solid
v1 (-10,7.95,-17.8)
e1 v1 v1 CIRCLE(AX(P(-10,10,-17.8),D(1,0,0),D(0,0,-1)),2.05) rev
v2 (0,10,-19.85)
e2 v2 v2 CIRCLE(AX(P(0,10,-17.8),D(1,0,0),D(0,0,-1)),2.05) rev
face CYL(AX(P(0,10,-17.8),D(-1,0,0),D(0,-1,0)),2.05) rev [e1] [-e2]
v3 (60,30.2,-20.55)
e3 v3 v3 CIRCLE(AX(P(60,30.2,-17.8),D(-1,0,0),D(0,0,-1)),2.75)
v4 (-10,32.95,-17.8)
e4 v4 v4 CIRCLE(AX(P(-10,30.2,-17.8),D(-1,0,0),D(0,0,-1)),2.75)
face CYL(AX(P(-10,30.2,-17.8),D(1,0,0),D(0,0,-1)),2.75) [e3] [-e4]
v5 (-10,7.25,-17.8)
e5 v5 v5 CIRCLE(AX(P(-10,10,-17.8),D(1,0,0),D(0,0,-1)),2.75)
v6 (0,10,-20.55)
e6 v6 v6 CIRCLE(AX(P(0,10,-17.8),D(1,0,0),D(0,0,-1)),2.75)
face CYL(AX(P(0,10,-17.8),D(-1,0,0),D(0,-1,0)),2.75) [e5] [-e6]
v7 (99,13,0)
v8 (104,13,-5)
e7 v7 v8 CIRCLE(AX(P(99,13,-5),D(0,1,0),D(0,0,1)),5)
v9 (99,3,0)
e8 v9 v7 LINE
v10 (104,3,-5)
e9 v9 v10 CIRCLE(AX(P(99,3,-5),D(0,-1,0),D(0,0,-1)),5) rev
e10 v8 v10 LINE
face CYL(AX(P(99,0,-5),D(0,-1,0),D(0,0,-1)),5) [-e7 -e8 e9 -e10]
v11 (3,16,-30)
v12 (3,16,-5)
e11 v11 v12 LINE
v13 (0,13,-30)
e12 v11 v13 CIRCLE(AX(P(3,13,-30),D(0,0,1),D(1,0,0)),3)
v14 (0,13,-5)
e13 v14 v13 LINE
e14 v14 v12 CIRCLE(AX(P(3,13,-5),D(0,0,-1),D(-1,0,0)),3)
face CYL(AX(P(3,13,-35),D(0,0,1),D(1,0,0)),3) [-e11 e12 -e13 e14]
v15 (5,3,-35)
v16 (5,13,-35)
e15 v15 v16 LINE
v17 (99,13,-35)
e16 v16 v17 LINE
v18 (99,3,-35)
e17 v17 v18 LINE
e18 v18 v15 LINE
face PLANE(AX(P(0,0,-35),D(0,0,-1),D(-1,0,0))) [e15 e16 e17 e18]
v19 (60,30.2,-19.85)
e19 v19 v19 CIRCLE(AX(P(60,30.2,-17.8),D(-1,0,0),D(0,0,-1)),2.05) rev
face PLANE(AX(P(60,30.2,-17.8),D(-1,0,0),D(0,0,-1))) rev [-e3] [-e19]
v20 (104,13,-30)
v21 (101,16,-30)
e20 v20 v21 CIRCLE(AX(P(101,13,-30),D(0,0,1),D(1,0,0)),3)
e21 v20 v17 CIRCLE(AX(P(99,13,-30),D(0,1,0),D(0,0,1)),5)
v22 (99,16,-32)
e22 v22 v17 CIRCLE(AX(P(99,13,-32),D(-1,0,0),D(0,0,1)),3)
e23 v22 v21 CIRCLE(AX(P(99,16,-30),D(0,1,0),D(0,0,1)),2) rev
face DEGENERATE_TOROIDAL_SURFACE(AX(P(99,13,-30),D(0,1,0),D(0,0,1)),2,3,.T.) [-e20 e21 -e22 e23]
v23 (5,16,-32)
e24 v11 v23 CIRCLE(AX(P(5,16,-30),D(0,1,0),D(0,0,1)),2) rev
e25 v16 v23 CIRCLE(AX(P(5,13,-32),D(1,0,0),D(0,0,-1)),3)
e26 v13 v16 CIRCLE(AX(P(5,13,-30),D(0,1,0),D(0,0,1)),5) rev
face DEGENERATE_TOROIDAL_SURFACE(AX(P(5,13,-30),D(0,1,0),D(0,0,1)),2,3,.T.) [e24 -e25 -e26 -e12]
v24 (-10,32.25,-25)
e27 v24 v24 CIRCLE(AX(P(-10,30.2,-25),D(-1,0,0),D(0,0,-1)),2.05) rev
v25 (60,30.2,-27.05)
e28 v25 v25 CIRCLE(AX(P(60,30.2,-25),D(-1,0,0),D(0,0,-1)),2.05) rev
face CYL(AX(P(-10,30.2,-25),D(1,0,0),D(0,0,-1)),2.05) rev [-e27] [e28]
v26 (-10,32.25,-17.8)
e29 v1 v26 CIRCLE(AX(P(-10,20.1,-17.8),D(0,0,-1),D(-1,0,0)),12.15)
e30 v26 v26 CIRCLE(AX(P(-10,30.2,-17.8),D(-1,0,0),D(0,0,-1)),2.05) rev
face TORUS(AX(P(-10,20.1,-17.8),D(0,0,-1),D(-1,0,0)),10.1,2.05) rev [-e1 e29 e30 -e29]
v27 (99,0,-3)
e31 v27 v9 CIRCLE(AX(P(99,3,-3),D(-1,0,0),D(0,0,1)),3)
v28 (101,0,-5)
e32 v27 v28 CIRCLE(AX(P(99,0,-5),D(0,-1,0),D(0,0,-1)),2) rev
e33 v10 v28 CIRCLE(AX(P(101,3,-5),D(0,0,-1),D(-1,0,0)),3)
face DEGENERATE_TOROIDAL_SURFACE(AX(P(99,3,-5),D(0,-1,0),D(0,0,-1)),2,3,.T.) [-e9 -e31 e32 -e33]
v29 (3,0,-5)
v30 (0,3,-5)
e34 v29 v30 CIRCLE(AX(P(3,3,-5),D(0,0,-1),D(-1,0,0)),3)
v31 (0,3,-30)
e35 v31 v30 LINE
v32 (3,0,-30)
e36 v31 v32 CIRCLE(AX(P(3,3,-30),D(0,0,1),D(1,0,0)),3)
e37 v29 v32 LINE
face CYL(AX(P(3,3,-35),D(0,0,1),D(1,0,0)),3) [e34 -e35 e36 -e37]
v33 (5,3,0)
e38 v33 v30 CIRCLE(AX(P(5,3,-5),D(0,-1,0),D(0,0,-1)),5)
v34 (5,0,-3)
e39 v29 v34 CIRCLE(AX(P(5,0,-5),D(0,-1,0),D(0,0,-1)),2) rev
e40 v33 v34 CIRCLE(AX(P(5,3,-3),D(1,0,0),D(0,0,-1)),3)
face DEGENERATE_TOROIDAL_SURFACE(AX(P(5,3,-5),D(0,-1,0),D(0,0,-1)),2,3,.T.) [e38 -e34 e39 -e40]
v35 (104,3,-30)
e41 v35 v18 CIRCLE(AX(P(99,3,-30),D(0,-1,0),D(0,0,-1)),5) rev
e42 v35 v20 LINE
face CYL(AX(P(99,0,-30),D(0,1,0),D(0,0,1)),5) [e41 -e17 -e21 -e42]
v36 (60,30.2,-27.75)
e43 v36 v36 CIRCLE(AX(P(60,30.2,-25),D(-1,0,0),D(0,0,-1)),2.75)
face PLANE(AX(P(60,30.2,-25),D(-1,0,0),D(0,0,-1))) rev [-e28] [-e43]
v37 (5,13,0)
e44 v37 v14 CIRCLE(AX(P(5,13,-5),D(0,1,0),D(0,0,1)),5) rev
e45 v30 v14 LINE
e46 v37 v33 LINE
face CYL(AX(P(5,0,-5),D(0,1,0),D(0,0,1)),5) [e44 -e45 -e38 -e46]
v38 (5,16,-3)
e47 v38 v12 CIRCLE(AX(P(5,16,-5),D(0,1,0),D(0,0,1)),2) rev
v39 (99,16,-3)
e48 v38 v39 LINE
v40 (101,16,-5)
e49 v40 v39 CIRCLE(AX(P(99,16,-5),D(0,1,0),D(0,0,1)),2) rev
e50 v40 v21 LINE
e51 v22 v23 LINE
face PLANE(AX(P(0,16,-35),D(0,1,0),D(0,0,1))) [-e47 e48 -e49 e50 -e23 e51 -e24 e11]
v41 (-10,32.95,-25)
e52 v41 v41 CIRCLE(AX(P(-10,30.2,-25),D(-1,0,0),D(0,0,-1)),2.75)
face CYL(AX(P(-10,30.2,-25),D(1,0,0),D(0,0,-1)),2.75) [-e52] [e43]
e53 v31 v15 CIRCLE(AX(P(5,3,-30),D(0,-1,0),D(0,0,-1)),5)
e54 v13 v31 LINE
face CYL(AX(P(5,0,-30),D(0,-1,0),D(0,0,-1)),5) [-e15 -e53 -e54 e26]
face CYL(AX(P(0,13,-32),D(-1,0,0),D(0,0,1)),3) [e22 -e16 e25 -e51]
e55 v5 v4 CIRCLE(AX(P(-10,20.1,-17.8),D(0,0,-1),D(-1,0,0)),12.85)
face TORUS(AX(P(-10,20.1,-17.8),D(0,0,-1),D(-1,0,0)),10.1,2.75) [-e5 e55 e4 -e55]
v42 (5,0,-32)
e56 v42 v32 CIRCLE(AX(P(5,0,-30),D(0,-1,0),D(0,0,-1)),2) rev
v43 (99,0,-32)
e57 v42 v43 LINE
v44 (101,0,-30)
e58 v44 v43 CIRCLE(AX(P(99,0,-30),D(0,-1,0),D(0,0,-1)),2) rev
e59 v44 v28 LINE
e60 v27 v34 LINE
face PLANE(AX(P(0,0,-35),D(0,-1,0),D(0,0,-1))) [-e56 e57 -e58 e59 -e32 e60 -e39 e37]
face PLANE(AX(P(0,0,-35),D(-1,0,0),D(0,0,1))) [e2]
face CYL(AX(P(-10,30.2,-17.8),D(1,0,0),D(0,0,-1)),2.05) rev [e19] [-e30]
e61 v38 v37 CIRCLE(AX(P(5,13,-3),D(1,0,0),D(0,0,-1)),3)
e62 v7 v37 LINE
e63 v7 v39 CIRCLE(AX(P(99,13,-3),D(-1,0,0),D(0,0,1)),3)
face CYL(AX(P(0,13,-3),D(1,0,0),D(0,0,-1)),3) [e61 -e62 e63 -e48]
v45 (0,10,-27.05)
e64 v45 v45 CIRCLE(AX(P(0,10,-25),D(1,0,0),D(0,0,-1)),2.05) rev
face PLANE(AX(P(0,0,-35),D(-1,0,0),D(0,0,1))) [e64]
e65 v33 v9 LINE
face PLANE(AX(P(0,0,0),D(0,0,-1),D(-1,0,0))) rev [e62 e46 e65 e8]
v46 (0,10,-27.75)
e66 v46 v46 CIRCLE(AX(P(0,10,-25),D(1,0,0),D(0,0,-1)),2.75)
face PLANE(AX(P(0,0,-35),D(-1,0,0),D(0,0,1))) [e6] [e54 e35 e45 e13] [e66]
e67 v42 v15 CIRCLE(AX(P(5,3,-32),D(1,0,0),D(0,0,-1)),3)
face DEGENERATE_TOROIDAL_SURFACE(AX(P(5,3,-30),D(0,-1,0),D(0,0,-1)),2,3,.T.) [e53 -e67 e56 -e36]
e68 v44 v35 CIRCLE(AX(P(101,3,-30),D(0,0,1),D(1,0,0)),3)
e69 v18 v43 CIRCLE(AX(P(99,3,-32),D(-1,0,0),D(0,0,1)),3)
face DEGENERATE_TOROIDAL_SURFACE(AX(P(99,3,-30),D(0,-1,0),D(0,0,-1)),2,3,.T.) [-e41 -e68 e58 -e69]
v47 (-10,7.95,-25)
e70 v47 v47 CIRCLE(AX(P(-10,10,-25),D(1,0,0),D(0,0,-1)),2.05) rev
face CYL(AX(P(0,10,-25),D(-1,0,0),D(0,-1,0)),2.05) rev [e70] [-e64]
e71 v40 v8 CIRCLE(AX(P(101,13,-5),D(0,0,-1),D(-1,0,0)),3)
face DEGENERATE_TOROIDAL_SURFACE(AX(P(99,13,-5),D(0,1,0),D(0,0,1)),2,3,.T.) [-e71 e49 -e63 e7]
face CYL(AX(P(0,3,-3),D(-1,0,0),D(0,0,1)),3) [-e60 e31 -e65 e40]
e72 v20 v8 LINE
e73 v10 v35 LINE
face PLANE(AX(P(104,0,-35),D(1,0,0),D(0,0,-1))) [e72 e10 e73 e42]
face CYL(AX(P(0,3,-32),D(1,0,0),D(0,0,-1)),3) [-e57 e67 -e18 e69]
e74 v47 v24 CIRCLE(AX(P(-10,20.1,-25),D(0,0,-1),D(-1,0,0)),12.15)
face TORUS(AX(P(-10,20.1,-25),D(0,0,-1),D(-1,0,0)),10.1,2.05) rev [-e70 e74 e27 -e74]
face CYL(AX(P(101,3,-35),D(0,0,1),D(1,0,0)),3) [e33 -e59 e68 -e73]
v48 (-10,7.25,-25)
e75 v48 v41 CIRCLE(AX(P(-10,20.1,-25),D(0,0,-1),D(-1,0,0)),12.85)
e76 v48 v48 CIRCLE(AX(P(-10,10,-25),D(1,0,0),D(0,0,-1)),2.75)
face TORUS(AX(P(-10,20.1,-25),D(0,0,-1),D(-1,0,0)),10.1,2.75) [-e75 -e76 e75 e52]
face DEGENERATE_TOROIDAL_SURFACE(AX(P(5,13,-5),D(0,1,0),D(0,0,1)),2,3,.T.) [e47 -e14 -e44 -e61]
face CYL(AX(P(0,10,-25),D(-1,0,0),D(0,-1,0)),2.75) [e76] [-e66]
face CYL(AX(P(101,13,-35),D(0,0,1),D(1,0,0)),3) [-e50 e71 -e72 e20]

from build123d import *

# Parameters (mm, degrees)
SKETCH_1_W      = 104
SKETCH_1_H      = 16
EXTRUDE_1_DEPTH = 35
SKETCH_2_R      = 2.75
SKETCH_2_R_2    = 2.05
FILLET_1_R      = 3
FILLET_2_R      = 5


with BuildPart() as part:
    # 草图1 → 凸台-拉伸1 (new body)
    with BuildSketch(Plane.XY):
        with Locations((52, 8)):
            Rectangle(SKETCH_1_W, SKETCH_1_H)
    extrude(amount=-EXTRUDE_1_DEPTH)

    # 扫描1: sweep along a path in 草图3
    with BuildLine(Plane.XY) as sweep_1_path:
        Line((0, 11.6), (-10, 11.6))
        ThreePointArc((-10, 11.6), (-18.5, 20.1), (-10, 28.6))
        Line((-10, 28.6), (60, 28.6))
    # 草图2 → 扫描1 (sweep)
    # profile 1 of 2: a face of its own
    with BuildSketch(Plane(origin=(0, 0, 0), x_dir=(0, 0, -1), z_dir=(1, 0, 0))):
        with Locations((25, 10)):
            Circle(SKETCH_2_R)
        with Locations((25, 10)):
            Circle(SKETCH_2_R_2, mode=Mode.SUBTRACT)
    # profile 2 of 2: a face of its own
    with BuildSketch(Plane(origin=(0, 0, 0), x_dir=(0, 0, -1), z_dir=(1, 0, 0))):
        with Locations((17.8, 10)):
            Circle(SKETCH_2_R)
        with Locations((17.8, 10)):
            Circle(SKETCH_2_R_2, mode=Mode.SUBTRACT)
    sweep(path=sweep_1_path.line)

    # 圆角1
    fillet_1_edges = [part.edges().sort_by_distance(p)[0] for p in [
        (52, 16, -35),
        (52, 16, 0),
        (52, 0, 0),
        (0, 16, -17.5),
        (104, 16, -17.5),
        (104, 0, -17.5),
        (0, 0, -17.5),
        (52, 0, -35),
    ]]
    fillet(fillet_1_edges, radius=FILLET_1_R)

    # 圆角2
    # the kernel refuses this fillet: 5 mm, written as the material it takes off along each edge
    with BuildSketch(Plane(origin=(5, 0, -30), x_dir=(-1, 0, 0), z_dir=(0, 0, 1))) as fillet_2_piece_1:
        with BuildLine():
            CenterArc((2, -3), 3, 0, 90)
            Line((5, -3), (5, 0))
            Line((5, 0), (2, 0))
        make_face()
    revolve(axis=Axis((5, 0, -30), (0, -1, 0)), revolution_arc=90, mode=Mode.SUBTRACT)
    with BuildSketch(Plane(origin=(5, 0, -5), x_dir=(0, 0, 1), z_dir=(1, 0, 0))) as fillet_2_piece_2:
        with BuildLine():
            CenterArc((2, -3), 3, 0, 90)
            Line((5, -3), (5, 0))
            Line((5, 0), (2, 0))
        make_face()
    revolve(axis=Axis((5, 0, -5), (0, -1, 0)), revolution_arc=90, mode=Mode.SUBTRACT)
    with BuildSketch(Plane(origin=(99, 0, -30), x_dir=(0, 0, -1), z_dir=(-1, 0, 0))) as fillet_2_piece_3:
        with BuildLine():
            CenterArc((2, -3), 3, 0, 90)
            Line((5, -3), (5, 0))
            Line((5, 0), (2, 0))
        make_face()
    revolve(axis=Axis((99, 0, -30), (0, -1, 0)), revolution_arc=90, mode=Mode.SUBTRACT)
    with BuildSketch(Plane(origin=(99, 0, -5), x_dir=(1, 0, 0), z_dir=(0, 0, -1))) as fillet_2_piece_4:
        with BuildLine():
            CenterArc((2, -3), 3, 0, 90)
            Line((5, -3), (5, 0))
            Line((5, 0), (2, 0))
        make_face()
    revolve(axis=Axis((99, 0, -5), (0, -1, 0)), revolution_arc=90, mode=Mode.SUBTRACT)
    with BuildSketch(Plane(origin=(99, 16, -30), x_dir=(1, 0, 0), z_dir=(0, 0, 1))) as fillet_2_piece_5:
        with BuildLine():
            CenterArc((2, -3), 3, 0, 90)
            Line((5, -3), (5, 0))
            Line((5, 0), (2, 0))
        make_face()
    revolve(axis=Axis((99, 16, -30), (0, 1, 0)), revolution_arc=90, mode=Mode.SUBTRACT)
    with BuildSketch(Plane(origin=(99, 16, -5), x_dir=(0, 0, 1), z_dir=(-1, 0, 0))) as fillet_2_piece_6:
        with BuildLine():
            CenterArc((2, -3), 3, 0, 90)
            Line((5, -3), (5, 0))
            Line((5, 0), (2, 0))
        make_face()
    revolve(axis=Axis((99, 16, -5), (0, 1, 0)), revolution_arc=90, mode=Mode.SUBTRACT)
    with BuildSketch(Plane(origin=(5, 16, -30), x_dir=(0, 0, -1), z_dir=(1, 0, 0))) as fillet_2_piece_7:
        with BuildLine():
            CenterArc((2, -3), 3, 0, 90)
            Line((5, -3), (5, 0))
            Line((5, 0), (2, 0))
        make_face()
    revolve(axis=Axis((5, 16, -30), (0, 1, 0)), revolution_arc=90, mode=Mode.SUBTRACT)
    with BuildSketch(Plane(origin=(5, 16, -5), x_dir=(-1, 0, 0), z_dir=(0, 0, -1))) as fillet_2_piece_8:
        with BuildLine():
            CenterArc((2, -3), 3, 0, 90)
            Line((5, -3), (5, 0))
            Line((5, 0), (2, 0))
        make_face()
    revolve(axis=Axis((5, 16, -5), (0, 1, 0)), revolution_arc=90, mode=Mode.SUBTRACT)
    with BuildSketch(Plane(origin=(104, 0, 0), x_dir=(-1, 0, 0), z_dir=(0, 1, 0)), Plane(origin=(104, 0, -35), x_dir=(0, 0, 1), z_dir=(0, 1, 0)), Plane(origin=(0, 16, -35), x_dir=(0, 0, 1), z_dir=(0, -1, 0)), Plane(origin=(0, 16, 0), x_dir=(1, 0, 0), z_dir=(0, -1, 0))) as fillet_2_piece_9:
        with BuildLine():
            CenterArc((FILLET_2_R, -FILLET_2_R), FILLET_2_R, 90, 90)
            Line((0, -FILLET_2_R), (0, 0))
            Line((0, 0), (FILLET_2_R, 0))
        make_face()
    extrude(amount=16, mode=Mode.SUBTRACT)


solid = part.part
